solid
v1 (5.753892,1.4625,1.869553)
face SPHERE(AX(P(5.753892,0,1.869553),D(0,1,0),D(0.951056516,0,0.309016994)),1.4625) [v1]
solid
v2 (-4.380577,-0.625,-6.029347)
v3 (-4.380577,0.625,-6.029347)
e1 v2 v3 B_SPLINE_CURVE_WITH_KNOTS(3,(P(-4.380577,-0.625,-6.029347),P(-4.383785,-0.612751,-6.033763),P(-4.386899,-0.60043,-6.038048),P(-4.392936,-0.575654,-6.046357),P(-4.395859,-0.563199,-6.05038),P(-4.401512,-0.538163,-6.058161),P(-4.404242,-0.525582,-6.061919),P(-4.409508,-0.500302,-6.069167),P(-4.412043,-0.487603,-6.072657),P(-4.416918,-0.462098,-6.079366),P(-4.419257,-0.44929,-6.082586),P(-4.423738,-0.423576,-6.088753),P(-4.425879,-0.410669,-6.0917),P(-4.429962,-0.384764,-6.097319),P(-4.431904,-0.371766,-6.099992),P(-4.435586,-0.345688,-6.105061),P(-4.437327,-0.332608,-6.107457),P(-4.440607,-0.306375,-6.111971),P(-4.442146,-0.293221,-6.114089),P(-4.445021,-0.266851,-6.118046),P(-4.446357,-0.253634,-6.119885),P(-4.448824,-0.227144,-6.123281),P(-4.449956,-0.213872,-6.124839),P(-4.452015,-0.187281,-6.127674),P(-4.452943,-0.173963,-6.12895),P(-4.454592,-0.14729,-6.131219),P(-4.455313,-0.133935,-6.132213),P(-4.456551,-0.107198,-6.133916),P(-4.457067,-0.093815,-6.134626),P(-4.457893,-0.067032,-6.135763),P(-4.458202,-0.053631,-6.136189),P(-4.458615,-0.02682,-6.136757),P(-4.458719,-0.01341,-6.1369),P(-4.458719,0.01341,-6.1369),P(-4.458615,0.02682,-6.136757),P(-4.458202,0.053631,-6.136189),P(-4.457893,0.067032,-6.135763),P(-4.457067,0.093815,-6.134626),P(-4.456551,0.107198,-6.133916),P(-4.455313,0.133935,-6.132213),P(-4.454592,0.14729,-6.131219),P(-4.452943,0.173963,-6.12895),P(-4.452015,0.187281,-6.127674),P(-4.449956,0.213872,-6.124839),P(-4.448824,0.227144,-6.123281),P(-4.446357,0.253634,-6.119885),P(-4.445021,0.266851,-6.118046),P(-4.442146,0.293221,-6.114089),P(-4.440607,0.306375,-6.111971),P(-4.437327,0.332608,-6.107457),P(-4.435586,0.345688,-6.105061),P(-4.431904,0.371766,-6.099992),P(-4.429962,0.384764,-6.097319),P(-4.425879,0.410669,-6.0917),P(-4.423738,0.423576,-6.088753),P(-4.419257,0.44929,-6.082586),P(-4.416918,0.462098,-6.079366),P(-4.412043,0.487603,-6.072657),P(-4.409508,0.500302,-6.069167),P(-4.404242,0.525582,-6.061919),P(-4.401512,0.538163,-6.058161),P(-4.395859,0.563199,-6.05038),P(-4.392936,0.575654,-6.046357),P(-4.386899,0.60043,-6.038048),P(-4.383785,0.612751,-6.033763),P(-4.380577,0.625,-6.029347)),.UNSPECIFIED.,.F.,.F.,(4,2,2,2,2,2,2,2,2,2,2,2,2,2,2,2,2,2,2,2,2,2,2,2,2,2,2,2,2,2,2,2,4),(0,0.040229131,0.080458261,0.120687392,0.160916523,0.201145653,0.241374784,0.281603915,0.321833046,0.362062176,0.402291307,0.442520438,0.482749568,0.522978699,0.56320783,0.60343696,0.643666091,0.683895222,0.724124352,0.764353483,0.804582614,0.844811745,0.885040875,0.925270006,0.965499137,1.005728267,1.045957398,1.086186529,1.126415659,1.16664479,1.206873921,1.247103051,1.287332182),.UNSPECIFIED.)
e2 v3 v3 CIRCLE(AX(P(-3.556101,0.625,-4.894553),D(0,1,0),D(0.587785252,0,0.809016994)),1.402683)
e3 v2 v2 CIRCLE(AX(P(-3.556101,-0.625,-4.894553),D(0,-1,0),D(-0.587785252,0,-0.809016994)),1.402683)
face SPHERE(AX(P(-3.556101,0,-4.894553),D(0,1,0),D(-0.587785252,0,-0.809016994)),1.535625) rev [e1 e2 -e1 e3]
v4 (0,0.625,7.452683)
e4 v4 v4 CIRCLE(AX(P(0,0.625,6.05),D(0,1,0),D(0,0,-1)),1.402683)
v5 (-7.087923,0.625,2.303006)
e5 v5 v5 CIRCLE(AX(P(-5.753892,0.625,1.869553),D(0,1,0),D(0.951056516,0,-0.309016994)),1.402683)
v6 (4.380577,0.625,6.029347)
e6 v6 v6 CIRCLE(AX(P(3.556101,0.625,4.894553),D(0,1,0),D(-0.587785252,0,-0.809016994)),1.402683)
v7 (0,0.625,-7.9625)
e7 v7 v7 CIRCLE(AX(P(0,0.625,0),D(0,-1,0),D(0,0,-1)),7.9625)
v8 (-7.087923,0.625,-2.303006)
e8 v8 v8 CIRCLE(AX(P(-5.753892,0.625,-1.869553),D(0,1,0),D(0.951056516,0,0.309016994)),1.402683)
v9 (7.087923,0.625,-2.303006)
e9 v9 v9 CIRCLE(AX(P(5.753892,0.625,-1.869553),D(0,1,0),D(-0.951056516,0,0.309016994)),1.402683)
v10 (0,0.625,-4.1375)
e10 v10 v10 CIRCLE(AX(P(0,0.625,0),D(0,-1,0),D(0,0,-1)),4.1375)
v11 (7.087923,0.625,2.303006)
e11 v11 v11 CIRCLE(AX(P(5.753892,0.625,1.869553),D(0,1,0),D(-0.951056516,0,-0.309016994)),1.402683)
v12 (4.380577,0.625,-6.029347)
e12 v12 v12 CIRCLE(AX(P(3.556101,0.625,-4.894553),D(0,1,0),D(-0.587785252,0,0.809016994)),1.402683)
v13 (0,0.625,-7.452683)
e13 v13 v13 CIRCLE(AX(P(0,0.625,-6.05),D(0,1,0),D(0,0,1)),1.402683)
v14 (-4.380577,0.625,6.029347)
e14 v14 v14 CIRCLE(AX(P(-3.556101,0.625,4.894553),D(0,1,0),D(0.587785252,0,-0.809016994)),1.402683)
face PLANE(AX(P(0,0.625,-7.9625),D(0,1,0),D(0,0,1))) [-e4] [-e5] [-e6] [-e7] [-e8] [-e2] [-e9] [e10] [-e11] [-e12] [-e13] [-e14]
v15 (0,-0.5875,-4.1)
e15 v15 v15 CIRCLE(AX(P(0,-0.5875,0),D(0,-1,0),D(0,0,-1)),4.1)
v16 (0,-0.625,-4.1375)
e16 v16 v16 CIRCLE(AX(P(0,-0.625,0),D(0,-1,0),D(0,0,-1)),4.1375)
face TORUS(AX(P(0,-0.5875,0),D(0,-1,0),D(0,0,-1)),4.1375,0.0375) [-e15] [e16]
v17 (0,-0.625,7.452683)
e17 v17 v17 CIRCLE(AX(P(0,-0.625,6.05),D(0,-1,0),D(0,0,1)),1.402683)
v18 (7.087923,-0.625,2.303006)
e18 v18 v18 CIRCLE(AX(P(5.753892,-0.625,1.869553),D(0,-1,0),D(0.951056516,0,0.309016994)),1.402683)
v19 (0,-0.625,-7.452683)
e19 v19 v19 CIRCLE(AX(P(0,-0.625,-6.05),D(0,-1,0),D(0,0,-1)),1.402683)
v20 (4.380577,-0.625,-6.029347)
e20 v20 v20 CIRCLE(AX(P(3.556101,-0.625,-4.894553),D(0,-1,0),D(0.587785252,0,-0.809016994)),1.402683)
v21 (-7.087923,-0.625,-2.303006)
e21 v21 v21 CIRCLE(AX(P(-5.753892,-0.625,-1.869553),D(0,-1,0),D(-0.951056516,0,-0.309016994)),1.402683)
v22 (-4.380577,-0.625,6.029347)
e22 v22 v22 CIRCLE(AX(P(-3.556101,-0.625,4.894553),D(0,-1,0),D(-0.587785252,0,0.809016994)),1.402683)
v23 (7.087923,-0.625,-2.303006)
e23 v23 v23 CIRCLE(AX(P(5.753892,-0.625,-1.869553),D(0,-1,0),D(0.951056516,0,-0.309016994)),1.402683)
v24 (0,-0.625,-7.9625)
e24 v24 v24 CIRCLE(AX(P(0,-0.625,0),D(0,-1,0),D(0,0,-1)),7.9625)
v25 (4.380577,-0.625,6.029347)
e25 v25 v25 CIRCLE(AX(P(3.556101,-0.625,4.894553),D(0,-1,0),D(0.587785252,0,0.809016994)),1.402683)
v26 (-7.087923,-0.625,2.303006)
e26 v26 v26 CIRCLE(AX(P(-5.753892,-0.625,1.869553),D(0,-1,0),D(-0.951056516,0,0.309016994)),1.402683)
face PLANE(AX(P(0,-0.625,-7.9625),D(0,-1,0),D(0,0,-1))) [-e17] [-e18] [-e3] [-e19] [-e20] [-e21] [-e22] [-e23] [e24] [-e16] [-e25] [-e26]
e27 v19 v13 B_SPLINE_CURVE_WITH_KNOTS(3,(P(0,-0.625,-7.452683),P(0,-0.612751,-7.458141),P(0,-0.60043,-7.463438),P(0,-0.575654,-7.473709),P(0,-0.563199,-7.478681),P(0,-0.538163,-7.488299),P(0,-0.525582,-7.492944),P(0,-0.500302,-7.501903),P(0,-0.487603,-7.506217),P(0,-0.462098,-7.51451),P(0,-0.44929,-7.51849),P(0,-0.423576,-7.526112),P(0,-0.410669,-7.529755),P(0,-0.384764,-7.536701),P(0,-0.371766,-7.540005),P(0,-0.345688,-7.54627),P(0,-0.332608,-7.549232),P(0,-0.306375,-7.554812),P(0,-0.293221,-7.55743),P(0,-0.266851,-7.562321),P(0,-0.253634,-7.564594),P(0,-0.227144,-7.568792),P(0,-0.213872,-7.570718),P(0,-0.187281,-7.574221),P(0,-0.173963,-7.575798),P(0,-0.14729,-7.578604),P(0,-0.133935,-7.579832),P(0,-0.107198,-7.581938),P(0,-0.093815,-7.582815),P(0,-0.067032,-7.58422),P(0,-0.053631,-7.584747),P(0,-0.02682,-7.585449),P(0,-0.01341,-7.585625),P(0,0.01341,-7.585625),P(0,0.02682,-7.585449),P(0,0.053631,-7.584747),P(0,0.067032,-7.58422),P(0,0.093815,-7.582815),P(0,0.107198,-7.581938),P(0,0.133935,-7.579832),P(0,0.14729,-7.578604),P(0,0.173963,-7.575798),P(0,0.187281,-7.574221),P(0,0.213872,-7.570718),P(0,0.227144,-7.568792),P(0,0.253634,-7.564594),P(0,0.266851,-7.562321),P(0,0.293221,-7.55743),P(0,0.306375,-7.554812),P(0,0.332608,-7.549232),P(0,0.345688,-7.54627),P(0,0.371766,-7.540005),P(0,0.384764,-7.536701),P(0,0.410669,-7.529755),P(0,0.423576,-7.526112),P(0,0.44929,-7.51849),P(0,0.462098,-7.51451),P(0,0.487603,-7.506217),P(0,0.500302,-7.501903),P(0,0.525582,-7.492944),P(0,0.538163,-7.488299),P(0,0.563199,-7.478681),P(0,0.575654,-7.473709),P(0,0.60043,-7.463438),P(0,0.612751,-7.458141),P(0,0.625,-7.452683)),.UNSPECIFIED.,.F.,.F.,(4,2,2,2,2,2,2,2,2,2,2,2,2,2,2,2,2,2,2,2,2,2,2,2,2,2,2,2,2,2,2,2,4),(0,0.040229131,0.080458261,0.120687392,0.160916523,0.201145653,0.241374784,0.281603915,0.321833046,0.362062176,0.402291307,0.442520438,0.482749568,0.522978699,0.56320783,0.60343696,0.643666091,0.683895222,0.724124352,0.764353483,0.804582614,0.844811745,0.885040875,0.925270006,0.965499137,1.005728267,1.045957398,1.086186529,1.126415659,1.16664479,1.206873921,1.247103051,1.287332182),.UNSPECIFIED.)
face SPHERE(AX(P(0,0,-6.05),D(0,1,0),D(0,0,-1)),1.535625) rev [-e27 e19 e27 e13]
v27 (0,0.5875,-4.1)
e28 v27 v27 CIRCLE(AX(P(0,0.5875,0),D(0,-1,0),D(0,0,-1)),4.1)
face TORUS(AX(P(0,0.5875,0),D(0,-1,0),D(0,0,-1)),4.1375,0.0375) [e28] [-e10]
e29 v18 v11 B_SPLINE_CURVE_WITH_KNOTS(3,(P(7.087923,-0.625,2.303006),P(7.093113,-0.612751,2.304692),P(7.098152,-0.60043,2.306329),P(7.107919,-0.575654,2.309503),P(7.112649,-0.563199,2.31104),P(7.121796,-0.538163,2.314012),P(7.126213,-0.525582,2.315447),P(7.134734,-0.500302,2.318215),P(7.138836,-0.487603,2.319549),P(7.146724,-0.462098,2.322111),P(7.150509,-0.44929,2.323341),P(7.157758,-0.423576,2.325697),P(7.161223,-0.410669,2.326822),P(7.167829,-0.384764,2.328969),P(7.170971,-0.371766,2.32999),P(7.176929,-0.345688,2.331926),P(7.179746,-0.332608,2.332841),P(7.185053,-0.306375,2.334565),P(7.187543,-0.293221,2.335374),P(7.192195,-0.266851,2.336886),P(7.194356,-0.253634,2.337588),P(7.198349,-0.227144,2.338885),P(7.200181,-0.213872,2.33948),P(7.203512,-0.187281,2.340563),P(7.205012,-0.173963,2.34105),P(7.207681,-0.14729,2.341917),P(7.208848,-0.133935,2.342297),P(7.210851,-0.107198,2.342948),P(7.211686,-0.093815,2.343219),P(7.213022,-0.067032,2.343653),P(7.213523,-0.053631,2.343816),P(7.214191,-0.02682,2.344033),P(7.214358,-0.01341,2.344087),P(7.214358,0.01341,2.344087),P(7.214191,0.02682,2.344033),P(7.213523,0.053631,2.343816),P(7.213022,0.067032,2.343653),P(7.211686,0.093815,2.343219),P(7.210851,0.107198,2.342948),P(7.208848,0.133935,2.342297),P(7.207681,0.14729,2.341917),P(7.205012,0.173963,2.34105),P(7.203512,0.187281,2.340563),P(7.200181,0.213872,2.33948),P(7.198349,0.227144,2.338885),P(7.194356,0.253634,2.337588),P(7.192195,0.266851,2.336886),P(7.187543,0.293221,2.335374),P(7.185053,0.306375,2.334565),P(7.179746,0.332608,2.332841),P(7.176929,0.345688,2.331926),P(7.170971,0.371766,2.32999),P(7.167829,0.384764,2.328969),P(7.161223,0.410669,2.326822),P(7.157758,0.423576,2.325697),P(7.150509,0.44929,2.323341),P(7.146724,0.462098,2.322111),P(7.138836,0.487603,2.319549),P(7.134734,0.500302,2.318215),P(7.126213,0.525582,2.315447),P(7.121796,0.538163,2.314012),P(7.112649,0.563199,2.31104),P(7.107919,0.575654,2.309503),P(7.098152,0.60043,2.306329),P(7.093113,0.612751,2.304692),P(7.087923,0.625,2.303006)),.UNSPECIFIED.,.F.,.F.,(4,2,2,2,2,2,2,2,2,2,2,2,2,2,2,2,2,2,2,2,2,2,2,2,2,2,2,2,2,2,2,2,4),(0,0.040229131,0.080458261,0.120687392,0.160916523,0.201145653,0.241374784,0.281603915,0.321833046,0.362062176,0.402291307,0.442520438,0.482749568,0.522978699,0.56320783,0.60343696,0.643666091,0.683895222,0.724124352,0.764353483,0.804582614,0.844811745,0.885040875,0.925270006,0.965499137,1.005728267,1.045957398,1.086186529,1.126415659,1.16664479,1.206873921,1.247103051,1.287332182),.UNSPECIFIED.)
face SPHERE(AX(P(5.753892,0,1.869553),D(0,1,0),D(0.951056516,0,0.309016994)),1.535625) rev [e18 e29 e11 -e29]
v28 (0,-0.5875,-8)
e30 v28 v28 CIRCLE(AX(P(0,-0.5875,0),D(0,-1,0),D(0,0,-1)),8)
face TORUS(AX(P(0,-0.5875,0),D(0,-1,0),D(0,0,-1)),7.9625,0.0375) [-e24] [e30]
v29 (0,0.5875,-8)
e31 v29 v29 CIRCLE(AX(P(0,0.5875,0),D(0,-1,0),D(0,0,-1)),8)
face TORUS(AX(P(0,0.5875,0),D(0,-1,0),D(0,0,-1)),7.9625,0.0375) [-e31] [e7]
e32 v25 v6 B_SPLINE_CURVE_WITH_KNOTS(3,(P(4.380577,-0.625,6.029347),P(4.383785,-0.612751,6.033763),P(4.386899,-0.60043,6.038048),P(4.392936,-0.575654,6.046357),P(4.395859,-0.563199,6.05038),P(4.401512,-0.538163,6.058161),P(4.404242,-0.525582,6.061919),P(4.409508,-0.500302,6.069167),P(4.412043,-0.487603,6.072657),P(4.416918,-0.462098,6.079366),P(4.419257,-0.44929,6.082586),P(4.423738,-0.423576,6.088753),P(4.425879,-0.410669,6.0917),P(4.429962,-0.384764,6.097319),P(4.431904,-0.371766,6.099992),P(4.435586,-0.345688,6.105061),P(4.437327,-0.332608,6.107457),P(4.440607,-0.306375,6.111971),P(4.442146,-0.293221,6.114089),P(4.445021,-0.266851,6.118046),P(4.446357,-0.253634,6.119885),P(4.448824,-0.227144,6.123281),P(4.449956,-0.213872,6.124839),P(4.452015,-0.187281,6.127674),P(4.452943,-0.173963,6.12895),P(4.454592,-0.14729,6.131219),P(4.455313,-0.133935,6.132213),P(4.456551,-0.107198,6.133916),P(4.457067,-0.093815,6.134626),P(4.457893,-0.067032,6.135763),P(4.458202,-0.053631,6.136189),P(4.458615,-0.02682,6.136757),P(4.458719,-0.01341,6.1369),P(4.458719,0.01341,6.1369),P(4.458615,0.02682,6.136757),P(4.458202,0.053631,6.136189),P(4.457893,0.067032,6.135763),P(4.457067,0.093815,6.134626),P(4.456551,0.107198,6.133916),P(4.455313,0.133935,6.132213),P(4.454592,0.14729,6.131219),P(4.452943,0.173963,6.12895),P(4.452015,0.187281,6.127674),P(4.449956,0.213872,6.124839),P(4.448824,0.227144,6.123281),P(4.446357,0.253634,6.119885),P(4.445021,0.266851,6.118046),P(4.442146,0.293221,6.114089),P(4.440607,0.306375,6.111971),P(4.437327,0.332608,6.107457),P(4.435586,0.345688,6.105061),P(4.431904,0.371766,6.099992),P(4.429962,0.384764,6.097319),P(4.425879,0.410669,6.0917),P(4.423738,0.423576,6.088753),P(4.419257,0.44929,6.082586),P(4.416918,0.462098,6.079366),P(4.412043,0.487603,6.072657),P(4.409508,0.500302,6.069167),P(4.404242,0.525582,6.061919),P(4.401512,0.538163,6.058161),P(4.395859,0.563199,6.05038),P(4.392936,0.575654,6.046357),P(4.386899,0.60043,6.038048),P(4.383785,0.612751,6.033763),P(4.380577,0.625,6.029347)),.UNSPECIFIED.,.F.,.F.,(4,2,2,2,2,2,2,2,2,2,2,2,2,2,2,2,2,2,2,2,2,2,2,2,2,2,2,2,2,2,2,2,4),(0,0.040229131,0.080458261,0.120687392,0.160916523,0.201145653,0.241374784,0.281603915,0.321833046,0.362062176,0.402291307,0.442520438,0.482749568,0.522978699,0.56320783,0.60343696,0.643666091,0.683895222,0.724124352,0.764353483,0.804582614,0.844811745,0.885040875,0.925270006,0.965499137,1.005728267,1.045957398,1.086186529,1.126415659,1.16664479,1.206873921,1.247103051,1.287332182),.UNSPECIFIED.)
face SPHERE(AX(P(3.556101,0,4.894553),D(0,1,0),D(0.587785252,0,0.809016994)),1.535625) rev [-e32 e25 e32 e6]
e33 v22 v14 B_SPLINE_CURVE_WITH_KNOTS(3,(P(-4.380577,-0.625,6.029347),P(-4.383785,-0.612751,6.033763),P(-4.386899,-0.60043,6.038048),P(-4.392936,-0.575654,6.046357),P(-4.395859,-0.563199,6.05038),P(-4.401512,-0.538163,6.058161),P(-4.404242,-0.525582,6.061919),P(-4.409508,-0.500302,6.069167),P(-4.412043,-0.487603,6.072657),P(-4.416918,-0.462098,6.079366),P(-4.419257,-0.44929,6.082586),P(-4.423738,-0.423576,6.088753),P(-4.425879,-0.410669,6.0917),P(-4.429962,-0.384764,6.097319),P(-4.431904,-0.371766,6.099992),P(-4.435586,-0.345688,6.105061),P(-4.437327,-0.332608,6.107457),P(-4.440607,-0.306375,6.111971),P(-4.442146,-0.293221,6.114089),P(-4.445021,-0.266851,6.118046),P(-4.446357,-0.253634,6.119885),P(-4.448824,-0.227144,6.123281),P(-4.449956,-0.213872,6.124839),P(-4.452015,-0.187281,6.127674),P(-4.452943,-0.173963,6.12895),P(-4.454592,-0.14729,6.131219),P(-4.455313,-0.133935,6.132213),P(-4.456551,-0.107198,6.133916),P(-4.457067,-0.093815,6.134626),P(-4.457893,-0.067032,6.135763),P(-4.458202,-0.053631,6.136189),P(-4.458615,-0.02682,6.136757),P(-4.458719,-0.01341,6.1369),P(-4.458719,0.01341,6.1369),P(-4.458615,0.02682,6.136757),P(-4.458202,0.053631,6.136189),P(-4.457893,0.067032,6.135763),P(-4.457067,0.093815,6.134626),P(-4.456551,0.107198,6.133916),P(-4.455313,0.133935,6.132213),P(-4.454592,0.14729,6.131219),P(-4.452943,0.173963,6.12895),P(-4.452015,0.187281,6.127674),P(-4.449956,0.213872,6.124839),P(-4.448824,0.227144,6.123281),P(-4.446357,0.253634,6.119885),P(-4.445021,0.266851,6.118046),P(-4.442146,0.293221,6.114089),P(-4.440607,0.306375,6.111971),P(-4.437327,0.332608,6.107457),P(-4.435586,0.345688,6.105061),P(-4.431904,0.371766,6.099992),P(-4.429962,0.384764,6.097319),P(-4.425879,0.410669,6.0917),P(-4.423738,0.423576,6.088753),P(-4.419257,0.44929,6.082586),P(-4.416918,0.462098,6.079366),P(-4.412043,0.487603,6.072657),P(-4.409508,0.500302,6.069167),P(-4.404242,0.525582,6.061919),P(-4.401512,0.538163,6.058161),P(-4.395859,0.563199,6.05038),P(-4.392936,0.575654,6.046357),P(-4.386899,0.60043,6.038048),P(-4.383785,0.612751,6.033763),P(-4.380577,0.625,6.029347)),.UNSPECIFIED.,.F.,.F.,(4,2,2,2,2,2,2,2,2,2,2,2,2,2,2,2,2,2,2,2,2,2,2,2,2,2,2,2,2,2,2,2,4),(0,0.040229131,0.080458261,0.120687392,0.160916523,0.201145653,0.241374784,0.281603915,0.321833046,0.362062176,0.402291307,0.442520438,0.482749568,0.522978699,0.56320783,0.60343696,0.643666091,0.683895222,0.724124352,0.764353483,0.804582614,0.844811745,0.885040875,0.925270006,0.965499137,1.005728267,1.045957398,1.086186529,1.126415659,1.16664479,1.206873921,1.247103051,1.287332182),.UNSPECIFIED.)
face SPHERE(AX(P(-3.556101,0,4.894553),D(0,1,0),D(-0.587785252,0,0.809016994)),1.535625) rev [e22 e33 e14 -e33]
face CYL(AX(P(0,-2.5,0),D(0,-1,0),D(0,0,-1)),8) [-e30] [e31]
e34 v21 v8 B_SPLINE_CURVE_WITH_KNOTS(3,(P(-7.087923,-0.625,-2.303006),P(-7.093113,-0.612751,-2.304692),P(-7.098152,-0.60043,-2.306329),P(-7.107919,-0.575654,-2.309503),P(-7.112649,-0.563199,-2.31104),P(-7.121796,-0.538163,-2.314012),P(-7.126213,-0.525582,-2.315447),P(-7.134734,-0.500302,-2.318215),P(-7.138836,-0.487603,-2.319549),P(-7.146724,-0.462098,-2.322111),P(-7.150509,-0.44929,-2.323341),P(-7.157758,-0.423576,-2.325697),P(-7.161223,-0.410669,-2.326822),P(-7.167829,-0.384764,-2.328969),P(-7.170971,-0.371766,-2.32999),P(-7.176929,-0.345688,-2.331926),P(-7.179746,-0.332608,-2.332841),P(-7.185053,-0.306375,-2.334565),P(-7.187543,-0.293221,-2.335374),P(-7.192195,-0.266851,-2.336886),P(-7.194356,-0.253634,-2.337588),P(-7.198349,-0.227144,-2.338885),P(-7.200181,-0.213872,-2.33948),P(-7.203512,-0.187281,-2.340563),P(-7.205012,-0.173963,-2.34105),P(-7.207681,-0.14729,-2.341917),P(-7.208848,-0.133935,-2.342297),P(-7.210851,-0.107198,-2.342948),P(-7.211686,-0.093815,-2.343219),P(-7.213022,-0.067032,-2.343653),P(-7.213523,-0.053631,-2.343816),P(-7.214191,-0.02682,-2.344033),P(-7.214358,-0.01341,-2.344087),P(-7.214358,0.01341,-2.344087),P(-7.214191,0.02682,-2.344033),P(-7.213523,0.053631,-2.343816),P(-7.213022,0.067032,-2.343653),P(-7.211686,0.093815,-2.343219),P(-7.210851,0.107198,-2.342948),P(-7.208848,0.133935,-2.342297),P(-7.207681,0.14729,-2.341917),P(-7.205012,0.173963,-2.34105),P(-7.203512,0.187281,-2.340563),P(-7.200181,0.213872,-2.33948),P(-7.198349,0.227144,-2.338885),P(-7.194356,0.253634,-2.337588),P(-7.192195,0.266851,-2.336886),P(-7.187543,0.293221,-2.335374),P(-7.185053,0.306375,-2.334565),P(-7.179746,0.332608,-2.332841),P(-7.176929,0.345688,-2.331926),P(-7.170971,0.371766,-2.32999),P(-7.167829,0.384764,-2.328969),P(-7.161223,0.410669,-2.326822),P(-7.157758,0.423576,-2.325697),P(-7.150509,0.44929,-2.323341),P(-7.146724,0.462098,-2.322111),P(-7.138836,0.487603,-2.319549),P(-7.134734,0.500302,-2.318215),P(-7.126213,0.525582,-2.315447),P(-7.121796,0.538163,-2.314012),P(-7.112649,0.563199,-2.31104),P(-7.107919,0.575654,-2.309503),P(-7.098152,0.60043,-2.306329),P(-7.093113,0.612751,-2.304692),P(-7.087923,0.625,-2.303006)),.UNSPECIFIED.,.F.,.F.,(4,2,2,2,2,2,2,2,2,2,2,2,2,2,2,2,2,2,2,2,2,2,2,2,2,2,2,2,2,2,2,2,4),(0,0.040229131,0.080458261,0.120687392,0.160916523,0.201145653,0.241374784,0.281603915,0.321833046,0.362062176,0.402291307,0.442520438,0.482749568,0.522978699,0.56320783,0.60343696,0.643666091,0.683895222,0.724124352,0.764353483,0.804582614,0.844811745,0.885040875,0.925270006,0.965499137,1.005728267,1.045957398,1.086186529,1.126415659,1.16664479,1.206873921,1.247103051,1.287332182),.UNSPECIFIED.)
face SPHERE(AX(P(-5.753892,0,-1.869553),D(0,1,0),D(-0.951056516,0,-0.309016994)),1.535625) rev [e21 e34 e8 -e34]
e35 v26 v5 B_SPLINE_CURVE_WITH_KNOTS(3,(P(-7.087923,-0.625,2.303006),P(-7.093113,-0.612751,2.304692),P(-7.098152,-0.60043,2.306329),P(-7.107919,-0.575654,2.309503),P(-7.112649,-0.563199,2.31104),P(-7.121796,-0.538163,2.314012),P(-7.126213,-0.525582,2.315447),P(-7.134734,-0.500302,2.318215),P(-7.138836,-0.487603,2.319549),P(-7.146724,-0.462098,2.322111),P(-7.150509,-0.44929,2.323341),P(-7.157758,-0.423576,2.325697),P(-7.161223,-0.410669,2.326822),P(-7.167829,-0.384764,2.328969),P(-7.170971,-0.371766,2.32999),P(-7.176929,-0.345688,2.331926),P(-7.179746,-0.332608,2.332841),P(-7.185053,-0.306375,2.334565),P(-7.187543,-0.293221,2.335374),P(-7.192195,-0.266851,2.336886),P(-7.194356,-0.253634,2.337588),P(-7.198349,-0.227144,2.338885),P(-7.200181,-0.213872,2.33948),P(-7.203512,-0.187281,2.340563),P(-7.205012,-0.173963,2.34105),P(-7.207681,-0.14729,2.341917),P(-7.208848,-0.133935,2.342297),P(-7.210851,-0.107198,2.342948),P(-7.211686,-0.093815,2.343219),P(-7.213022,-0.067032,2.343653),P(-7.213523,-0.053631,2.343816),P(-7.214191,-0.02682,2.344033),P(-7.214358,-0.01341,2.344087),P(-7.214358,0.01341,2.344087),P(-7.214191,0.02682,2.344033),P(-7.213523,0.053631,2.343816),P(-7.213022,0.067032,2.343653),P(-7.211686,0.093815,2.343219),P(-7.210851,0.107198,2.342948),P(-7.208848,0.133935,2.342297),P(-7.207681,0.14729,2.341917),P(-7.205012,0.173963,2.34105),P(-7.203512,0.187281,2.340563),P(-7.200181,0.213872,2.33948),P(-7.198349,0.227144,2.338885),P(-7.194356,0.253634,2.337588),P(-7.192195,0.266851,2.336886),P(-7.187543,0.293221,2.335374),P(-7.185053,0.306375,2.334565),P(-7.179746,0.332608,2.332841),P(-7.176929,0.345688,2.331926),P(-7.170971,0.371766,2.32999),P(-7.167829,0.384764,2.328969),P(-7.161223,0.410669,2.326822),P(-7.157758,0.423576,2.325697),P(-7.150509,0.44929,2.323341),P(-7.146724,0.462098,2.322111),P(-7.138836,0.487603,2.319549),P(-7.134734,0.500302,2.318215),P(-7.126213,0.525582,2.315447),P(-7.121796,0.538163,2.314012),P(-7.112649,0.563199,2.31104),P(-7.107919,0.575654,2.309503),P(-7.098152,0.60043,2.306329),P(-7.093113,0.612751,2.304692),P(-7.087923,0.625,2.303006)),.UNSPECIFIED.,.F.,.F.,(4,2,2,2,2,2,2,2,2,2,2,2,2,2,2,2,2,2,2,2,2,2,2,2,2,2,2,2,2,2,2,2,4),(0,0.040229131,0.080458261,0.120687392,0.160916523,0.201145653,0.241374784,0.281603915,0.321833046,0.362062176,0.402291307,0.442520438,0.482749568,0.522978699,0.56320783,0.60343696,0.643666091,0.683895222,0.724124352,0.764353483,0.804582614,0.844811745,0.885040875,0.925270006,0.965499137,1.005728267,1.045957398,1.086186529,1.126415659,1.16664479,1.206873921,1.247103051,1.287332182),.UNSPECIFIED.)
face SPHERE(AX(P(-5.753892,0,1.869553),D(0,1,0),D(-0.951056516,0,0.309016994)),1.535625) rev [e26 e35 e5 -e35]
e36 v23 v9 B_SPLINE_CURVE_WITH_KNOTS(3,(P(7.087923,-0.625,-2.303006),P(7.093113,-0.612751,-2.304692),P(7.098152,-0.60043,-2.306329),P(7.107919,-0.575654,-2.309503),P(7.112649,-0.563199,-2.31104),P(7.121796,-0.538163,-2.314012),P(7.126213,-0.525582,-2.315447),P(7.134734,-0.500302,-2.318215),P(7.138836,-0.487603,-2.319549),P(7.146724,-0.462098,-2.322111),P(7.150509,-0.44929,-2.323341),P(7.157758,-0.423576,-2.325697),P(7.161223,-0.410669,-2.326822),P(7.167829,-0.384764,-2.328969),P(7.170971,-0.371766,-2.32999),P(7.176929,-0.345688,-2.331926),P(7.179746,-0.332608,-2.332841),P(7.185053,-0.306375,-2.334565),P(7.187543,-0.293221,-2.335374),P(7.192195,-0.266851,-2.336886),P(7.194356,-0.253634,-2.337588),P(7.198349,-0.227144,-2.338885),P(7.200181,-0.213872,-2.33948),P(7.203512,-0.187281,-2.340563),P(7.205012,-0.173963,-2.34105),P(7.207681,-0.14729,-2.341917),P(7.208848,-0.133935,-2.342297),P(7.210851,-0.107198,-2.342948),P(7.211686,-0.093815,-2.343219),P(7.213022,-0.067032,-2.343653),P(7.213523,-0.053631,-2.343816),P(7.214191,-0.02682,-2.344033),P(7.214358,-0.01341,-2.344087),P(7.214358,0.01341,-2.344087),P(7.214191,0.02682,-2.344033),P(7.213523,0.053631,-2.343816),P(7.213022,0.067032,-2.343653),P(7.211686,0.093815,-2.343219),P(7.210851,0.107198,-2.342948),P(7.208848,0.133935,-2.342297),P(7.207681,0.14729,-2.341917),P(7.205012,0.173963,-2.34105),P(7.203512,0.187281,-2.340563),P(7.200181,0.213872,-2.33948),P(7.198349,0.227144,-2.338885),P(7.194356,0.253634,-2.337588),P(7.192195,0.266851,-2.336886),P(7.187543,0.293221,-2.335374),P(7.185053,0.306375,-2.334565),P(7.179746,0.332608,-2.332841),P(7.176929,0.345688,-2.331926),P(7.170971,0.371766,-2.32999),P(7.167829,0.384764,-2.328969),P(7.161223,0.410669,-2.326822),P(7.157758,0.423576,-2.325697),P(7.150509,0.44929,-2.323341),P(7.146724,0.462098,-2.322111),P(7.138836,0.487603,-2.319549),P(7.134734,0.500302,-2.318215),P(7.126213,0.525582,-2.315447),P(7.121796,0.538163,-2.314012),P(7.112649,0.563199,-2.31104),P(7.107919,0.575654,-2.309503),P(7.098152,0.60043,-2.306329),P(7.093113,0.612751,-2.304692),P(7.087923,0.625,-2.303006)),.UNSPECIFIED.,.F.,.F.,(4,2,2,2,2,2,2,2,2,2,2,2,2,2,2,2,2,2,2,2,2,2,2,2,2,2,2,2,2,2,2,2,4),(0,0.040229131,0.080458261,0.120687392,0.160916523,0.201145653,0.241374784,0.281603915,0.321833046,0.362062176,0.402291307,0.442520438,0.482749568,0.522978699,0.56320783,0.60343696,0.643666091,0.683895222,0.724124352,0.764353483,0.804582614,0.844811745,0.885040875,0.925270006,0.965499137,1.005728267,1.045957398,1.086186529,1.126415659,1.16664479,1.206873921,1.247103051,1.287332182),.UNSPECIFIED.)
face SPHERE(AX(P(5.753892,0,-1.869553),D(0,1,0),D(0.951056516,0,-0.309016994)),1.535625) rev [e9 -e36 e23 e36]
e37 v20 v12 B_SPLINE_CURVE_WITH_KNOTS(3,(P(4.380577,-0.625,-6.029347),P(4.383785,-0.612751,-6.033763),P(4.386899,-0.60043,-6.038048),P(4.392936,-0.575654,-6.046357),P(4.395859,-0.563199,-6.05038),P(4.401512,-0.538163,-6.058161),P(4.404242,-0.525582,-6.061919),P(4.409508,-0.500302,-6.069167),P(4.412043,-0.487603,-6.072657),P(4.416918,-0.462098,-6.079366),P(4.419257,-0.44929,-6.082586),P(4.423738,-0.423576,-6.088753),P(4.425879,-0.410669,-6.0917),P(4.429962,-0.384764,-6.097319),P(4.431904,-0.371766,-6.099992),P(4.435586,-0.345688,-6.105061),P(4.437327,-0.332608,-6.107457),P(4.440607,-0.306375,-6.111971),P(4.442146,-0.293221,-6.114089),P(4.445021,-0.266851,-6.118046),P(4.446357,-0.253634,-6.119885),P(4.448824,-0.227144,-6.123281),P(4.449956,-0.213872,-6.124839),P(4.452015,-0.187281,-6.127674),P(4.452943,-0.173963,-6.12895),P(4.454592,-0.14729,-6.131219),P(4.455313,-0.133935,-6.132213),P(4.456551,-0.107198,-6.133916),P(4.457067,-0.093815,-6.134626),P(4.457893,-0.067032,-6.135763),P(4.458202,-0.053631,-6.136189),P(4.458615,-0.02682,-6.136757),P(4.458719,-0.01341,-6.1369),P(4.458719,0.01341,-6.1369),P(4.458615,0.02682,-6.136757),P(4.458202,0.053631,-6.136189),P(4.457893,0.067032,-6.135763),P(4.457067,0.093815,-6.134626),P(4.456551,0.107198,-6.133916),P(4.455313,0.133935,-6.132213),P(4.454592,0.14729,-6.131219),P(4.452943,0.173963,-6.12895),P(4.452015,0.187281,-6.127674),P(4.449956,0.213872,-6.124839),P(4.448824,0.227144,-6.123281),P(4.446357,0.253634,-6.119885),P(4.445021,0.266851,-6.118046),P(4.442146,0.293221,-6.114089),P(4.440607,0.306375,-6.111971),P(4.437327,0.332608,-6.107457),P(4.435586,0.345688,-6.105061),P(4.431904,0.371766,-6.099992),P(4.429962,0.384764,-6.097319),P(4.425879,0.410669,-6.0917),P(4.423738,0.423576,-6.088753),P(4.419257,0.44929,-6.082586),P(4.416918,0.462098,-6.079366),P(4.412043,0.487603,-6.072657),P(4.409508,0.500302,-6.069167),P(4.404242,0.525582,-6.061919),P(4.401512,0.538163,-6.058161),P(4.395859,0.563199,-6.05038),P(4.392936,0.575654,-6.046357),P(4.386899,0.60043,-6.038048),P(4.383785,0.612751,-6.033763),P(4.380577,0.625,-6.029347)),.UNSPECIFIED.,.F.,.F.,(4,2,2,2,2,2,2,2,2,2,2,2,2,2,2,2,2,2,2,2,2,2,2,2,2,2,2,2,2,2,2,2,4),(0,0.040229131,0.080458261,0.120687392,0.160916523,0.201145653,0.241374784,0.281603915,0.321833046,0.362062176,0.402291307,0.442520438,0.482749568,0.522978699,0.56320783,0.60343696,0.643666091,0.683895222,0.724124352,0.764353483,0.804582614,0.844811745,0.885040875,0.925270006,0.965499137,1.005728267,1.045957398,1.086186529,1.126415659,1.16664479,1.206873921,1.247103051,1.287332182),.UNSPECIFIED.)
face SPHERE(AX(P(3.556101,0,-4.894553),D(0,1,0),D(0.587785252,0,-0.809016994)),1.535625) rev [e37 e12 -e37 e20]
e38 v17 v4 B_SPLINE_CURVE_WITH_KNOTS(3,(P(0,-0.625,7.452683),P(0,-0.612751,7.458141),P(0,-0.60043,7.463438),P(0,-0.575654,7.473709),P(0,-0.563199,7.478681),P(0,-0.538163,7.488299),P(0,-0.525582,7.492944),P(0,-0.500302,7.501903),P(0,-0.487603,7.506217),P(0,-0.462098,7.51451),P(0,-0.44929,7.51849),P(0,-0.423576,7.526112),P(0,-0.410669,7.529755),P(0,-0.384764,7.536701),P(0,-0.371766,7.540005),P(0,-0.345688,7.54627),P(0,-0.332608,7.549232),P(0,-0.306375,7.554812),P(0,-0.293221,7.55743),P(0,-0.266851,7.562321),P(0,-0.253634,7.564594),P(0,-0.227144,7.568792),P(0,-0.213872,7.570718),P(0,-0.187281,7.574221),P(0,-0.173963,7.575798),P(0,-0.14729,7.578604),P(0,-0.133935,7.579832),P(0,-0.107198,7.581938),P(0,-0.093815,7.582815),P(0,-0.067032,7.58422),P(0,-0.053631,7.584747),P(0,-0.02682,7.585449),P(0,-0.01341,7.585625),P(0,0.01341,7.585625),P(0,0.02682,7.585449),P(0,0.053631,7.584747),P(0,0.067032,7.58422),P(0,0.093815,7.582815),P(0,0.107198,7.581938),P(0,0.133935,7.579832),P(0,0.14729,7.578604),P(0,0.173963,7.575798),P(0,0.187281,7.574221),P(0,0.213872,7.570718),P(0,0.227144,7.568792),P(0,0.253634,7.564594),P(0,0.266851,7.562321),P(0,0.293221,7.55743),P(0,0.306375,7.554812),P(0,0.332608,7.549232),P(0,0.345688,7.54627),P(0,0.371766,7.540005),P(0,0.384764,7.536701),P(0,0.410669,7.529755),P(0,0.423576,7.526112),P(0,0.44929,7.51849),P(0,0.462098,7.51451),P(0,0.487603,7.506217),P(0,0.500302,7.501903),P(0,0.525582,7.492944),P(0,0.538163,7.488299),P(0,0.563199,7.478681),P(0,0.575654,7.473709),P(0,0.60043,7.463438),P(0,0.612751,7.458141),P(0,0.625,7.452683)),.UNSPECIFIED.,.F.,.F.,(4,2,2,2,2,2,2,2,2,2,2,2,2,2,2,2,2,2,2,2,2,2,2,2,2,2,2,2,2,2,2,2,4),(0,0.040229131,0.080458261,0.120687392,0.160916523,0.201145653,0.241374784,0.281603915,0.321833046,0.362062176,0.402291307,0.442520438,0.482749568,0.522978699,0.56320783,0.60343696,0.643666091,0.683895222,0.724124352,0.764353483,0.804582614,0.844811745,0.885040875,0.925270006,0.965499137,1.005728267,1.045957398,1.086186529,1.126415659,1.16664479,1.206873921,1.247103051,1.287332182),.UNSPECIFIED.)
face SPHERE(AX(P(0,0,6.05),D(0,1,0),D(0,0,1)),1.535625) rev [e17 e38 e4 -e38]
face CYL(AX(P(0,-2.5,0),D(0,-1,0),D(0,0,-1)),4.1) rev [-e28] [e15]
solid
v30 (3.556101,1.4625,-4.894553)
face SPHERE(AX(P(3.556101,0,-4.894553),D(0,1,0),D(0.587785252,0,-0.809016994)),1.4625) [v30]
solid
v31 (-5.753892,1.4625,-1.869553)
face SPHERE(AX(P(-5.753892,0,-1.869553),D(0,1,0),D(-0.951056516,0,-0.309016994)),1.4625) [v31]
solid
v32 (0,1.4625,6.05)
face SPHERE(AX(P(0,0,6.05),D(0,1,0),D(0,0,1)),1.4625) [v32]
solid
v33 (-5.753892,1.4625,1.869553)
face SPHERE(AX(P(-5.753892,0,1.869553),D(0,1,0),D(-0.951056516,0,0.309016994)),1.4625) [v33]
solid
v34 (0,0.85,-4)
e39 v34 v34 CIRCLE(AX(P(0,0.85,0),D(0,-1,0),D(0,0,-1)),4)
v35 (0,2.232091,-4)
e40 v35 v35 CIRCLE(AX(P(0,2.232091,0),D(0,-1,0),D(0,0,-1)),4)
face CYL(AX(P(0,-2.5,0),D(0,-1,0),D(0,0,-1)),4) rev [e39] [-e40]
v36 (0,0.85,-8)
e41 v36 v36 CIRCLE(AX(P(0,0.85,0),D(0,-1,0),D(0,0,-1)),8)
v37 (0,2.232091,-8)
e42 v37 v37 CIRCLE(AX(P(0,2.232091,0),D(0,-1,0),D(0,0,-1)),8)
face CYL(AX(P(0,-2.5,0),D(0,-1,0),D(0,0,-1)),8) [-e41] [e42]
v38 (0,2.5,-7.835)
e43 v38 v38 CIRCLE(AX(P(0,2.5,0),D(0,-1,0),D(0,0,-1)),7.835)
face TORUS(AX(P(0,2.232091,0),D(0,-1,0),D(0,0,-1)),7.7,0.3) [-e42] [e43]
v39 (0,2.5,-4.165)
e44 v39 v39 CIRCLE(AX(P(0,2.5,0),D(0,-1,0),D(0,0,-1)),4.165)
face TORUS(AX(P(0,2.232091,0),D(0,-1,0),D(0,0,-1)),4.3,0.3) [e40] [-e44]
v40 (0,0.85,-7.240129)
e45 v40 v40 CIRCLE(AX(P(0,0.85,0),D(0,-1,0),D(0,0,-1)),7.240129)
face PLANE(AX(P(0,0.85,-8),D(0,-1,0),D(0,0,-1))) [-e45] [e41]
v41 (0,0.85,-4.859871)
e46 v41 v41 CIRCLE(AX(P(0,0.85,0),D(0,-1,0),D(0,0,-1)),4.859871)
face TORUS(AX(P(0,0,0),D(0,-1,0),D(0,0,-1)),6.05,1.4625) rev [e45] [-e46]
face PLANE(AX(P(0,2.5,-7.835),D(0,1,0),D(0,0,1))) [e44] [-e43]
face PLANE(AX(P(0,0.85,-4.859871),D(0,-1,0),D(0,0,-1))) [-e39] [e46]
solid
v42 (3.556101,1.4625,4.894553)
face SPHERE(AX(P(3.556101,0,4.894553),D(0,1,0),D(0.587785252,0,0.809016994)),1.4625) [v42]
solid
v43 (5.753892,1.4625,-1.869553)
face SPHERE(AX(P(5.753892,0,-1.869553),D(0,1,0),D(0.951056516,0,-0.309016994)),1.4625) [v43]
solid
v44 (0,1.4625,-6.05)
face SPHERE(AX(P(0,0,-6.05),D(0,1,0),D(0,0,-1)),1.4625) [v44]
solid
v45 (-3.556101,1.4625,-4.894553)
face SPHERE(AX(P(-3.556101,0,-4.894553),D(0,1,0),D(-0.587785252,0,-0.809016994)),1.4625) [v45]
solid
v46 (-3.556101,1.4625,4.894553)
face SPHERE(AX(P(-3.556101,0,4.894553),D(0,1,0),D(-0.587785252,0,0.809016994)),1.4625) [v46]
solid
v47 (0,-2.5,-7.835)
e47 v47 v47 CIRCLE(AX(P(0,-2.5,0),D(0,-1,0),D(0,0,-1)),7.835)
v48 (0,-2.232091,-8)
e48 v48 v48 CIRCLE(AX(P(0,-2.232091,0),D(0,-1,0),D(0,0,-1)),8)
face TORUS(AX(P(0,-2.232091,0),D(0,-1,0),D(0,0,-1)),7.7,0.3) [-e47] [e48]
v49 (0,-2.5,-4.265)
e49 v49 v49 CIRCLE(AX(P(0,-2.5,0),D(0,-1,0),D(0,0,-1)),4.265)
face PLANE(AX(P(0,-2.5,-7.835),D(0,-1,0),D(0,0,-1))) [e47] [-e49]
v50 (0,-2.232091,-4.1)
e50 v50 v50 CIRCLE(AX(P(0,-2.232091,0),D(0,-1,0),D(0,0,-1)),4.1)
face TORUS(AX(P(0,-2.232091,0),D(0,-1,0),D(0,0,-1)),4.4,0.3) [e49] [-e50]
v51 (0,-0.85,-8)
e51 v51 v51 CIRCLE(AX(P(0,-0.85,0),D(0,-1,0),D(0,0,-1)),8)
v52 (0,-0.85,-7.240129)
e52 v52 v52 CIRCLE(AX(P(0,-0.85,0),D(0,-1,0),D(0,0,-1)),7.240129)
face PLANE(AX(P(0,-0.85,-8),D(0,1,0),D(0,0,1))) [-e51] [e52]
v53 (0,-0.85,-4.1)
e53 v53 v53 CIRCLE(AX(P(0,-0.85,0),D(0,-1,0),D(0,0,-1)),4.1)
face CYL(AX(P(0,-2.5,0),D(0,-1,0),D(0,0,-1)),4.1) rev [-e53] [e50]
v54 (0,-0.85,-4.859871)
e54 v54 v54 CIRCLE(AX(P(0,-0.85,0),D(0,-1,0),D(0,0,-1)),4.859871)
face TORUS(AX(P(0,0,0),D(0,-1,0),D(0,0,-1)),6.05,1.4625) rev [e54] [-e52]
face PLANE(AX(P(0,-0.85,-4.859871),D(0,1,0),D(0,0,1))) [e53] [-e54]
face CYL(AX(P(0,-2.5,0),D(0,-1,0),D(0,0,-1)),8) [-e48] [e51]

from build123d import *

# Parameters (mm, degrees)
CIRPATTERN1_COUNT = 10
CIRPATTERN2_COUNT = 10


# Read off the part's stored shape, not the designer's step: Cut-Revolve1
with BuildPart() as part:
    # Sketch3 → Revolve1 (revolve)
    with BuildSketch(Plane(origin=(0, 0, 0), x_dir=(0, 0, -1), z_dir=(1, 0, 0))):
        with BuildLine():
            Line((8, 0.85), (7.24012867, 0.85))
            ThreePointArc((7.24012867, 0.85), (6.05, 1.4625), (4.85987133, 0.85))
            Line((4.85987133, 0.85), (4, 0.85))
            Line((4, 0.85), (4, 2.232091434))
            ThreePointArc((4, 2.232091434), (4.044559205, 2.389412761), (4.165, 2.5))
            Line((4.165, 2.5), (7.835, 2.5))
            ThreePointArc((7.835, 2.5), (7.955440795, 2.389412761), (8, 2.232091434))
            Line((8, 2.232091434), (8, 0.85))
        make_face()
        with BuildLine():
            Line((4.85987133, -0.85), (4.1, -0.85))
            Line((4.1, -0.85), (4.1, -2.232091434))
            ThreePointArc((4.1, -2.232091434), (4.144559205, -2.389412761), (4.265, -2.5))
            Line((4.265, -2.5), (7.835, -2.5))
            ThreePointArc((7.835, -2.5), (7.955440795, -2.389412761), (8, -2.232091434))
            Line((8, -2.232091434), (8, -0.85))
            Line((8, -0.85), (7.24012867, -0.85))
            ThreePointArc((7.24012867, -0.85), (6.05, -1.4625), (4.85987133, -0.85))
        make_face()
        with BuildLine():
            Line((7.9625, 0.625), (4.1375, 0.625))
            ThreePointArc((4.1375, 0.625), (4.110983496, 0.614016504), (4.1, 0.5875))
            Line((4.1, 0.5875), (4.1, -0.5875))
            ThreePointArc((4.1, -0.5875), (4.110983496, -0.614016504), (4.1375, -0.625))
            Line((4.1375, -0.625), (7.9625, -0.625))
            ThreePointArc((7.9625, -0.625), (7.989016504, -0.614016504), (8, -0.5875))
            Line((8, -0.5875), (8, 0.5875))
            ThreePointArc((8, 0.5875), (7.989016504, 0.614016504), (7.9625, 0.625))
        make_face()
    revolve(axis=Axis((0, -2.5, 0), (0, 1, 0)))

    # Cut-Revolve1 outline → Cut-Revolve1 (revolve, cut)
    with BuildSketch(Plane.XY.offset(-6.05)):
        with BuildLine():
            Line((1.402682836, 0.625000001), (0, 0.625000001))
            Line((0, 0.625000001), (0, -0.625000001))
            Line((0, -0.625000001), (1.402682836, -0.625000001))
            ThreePointArc((1.402682836, -0.625000001), (1.535625, 0), (1.402682836, 0.625000001))
        make_face()
    cut_revolve1 = revolve(axis=Axis((0, 0, -6.05), (0, 1, 0)), mode=Mode.SUBTRACT)

    # CirPattern2: Cut-Revolve1 ×10 about axis
    cirpattern2_axis = Axis((0, 0, 0), (0, 1, 0))
    for i in range(1, CIRPATTERN2_COUNT):
        add(cut_revolve1.rotate(cirpattern2_axis, i * 360 / CIRPATTERN2_COUNT), mode=Mode.SUBTRACT)


with BuildPart() as body_2:
    # Sketch4 → Revolve2 (revolve)
    with BuildSketch(Plane(origin=(0, 0, 0), x_dir=(0, 0, -1), z_dir=(1, 0, 0))):
        with BuildLine():
            Line((6.05, -1.4625), (6.05, 1.4625))
            ThreePointArc((6.05, 1.4625), (4.5875, 0), (6.05, -1.4625))
        make_face()
    revolve(axis=Axis((0, 2.5, -6.05), (0, -1, 0)))


with BuildPart() as cirpattern1_1:
    # CirPattern1: pattern copy
    add(body_2.part.rotate(Axis((0, 0, 0), (0, 1, 0)), 1 * 360 / CIRPATTERN1_COUNT))


with BuildPart() as cirpattern1_2:
    # CirPattern1: pattern copy
    add(body_2.part.rotate(Axis((0, 0, 0), (0, 1, 0)), 2 * 360 / CIRPATTERN1_COUNT))


with BuildPart() as cirpattern1_3:
    # CirPattern1: pattern copy
    add(body_2.part.rotate(Axis((0, 0, 0), (0, 1, 0)), 3 * 360 / CIRPATTERN1_COUNT))


with BuildPart() as cirpattern1_4:
    # CirPattern1: pattern copy
    add(body_2.part.rotate(Axis((0, 0, 0), (0, 1, 0)), 4 * 360 / CIRPATTERN1_COUNT))


with BuildPart() as cirpattern1_5:
    # CirPattern1: pattern copy
    add(body_2.part.rotate(Axis((0, 0, 0), (0, 1, 0)), 5 * 360 / CIRPATTERN1_COUNT))


with BuildPart() as cirpattern1_6:
    # CirPattern1: pattern copy
    add(body_2.part.rotate(Axis((0, 0, 0), (0, 1, 0)), 6 * 360 / CIRPATTERN1_COUNT))


with BuildPart() as cirpattern1_7:
    # CirPattern1: pattern copy
    add(body_2.part.rotate(Axis((0, 0, 0), (0, 1, 0)), 7 * 360 / CIRPATTERN1_COUNT))


with BuildPart() as cirpattern1_8:
    # CirPattern1: pattern copy
    add(body_2.part.rotate(Axis((0, 0, 0), (0, 1, 0)), 8 * 360 / CIRPATTERN1_COUNT))


with BuildPart() as cirpattern1_9:
    # CirPattern1: pattern copy
    add(body_2.part.rotate(Axis((0, 0, 0), (0, 1, 0)), 9 * 360 / CIRPATTERN1_COUNT))


solid = Compound([part.part, body_2.part, cirpattern1_1.part, cirpattern1_2.part, cirpattern1_3.part, cirpattern1_4.part, cirpattern1_5.part, cirpattern1_6.part, cirpattern1_7.part, cirpattern1_8.part, cirpattern1_9.part])
